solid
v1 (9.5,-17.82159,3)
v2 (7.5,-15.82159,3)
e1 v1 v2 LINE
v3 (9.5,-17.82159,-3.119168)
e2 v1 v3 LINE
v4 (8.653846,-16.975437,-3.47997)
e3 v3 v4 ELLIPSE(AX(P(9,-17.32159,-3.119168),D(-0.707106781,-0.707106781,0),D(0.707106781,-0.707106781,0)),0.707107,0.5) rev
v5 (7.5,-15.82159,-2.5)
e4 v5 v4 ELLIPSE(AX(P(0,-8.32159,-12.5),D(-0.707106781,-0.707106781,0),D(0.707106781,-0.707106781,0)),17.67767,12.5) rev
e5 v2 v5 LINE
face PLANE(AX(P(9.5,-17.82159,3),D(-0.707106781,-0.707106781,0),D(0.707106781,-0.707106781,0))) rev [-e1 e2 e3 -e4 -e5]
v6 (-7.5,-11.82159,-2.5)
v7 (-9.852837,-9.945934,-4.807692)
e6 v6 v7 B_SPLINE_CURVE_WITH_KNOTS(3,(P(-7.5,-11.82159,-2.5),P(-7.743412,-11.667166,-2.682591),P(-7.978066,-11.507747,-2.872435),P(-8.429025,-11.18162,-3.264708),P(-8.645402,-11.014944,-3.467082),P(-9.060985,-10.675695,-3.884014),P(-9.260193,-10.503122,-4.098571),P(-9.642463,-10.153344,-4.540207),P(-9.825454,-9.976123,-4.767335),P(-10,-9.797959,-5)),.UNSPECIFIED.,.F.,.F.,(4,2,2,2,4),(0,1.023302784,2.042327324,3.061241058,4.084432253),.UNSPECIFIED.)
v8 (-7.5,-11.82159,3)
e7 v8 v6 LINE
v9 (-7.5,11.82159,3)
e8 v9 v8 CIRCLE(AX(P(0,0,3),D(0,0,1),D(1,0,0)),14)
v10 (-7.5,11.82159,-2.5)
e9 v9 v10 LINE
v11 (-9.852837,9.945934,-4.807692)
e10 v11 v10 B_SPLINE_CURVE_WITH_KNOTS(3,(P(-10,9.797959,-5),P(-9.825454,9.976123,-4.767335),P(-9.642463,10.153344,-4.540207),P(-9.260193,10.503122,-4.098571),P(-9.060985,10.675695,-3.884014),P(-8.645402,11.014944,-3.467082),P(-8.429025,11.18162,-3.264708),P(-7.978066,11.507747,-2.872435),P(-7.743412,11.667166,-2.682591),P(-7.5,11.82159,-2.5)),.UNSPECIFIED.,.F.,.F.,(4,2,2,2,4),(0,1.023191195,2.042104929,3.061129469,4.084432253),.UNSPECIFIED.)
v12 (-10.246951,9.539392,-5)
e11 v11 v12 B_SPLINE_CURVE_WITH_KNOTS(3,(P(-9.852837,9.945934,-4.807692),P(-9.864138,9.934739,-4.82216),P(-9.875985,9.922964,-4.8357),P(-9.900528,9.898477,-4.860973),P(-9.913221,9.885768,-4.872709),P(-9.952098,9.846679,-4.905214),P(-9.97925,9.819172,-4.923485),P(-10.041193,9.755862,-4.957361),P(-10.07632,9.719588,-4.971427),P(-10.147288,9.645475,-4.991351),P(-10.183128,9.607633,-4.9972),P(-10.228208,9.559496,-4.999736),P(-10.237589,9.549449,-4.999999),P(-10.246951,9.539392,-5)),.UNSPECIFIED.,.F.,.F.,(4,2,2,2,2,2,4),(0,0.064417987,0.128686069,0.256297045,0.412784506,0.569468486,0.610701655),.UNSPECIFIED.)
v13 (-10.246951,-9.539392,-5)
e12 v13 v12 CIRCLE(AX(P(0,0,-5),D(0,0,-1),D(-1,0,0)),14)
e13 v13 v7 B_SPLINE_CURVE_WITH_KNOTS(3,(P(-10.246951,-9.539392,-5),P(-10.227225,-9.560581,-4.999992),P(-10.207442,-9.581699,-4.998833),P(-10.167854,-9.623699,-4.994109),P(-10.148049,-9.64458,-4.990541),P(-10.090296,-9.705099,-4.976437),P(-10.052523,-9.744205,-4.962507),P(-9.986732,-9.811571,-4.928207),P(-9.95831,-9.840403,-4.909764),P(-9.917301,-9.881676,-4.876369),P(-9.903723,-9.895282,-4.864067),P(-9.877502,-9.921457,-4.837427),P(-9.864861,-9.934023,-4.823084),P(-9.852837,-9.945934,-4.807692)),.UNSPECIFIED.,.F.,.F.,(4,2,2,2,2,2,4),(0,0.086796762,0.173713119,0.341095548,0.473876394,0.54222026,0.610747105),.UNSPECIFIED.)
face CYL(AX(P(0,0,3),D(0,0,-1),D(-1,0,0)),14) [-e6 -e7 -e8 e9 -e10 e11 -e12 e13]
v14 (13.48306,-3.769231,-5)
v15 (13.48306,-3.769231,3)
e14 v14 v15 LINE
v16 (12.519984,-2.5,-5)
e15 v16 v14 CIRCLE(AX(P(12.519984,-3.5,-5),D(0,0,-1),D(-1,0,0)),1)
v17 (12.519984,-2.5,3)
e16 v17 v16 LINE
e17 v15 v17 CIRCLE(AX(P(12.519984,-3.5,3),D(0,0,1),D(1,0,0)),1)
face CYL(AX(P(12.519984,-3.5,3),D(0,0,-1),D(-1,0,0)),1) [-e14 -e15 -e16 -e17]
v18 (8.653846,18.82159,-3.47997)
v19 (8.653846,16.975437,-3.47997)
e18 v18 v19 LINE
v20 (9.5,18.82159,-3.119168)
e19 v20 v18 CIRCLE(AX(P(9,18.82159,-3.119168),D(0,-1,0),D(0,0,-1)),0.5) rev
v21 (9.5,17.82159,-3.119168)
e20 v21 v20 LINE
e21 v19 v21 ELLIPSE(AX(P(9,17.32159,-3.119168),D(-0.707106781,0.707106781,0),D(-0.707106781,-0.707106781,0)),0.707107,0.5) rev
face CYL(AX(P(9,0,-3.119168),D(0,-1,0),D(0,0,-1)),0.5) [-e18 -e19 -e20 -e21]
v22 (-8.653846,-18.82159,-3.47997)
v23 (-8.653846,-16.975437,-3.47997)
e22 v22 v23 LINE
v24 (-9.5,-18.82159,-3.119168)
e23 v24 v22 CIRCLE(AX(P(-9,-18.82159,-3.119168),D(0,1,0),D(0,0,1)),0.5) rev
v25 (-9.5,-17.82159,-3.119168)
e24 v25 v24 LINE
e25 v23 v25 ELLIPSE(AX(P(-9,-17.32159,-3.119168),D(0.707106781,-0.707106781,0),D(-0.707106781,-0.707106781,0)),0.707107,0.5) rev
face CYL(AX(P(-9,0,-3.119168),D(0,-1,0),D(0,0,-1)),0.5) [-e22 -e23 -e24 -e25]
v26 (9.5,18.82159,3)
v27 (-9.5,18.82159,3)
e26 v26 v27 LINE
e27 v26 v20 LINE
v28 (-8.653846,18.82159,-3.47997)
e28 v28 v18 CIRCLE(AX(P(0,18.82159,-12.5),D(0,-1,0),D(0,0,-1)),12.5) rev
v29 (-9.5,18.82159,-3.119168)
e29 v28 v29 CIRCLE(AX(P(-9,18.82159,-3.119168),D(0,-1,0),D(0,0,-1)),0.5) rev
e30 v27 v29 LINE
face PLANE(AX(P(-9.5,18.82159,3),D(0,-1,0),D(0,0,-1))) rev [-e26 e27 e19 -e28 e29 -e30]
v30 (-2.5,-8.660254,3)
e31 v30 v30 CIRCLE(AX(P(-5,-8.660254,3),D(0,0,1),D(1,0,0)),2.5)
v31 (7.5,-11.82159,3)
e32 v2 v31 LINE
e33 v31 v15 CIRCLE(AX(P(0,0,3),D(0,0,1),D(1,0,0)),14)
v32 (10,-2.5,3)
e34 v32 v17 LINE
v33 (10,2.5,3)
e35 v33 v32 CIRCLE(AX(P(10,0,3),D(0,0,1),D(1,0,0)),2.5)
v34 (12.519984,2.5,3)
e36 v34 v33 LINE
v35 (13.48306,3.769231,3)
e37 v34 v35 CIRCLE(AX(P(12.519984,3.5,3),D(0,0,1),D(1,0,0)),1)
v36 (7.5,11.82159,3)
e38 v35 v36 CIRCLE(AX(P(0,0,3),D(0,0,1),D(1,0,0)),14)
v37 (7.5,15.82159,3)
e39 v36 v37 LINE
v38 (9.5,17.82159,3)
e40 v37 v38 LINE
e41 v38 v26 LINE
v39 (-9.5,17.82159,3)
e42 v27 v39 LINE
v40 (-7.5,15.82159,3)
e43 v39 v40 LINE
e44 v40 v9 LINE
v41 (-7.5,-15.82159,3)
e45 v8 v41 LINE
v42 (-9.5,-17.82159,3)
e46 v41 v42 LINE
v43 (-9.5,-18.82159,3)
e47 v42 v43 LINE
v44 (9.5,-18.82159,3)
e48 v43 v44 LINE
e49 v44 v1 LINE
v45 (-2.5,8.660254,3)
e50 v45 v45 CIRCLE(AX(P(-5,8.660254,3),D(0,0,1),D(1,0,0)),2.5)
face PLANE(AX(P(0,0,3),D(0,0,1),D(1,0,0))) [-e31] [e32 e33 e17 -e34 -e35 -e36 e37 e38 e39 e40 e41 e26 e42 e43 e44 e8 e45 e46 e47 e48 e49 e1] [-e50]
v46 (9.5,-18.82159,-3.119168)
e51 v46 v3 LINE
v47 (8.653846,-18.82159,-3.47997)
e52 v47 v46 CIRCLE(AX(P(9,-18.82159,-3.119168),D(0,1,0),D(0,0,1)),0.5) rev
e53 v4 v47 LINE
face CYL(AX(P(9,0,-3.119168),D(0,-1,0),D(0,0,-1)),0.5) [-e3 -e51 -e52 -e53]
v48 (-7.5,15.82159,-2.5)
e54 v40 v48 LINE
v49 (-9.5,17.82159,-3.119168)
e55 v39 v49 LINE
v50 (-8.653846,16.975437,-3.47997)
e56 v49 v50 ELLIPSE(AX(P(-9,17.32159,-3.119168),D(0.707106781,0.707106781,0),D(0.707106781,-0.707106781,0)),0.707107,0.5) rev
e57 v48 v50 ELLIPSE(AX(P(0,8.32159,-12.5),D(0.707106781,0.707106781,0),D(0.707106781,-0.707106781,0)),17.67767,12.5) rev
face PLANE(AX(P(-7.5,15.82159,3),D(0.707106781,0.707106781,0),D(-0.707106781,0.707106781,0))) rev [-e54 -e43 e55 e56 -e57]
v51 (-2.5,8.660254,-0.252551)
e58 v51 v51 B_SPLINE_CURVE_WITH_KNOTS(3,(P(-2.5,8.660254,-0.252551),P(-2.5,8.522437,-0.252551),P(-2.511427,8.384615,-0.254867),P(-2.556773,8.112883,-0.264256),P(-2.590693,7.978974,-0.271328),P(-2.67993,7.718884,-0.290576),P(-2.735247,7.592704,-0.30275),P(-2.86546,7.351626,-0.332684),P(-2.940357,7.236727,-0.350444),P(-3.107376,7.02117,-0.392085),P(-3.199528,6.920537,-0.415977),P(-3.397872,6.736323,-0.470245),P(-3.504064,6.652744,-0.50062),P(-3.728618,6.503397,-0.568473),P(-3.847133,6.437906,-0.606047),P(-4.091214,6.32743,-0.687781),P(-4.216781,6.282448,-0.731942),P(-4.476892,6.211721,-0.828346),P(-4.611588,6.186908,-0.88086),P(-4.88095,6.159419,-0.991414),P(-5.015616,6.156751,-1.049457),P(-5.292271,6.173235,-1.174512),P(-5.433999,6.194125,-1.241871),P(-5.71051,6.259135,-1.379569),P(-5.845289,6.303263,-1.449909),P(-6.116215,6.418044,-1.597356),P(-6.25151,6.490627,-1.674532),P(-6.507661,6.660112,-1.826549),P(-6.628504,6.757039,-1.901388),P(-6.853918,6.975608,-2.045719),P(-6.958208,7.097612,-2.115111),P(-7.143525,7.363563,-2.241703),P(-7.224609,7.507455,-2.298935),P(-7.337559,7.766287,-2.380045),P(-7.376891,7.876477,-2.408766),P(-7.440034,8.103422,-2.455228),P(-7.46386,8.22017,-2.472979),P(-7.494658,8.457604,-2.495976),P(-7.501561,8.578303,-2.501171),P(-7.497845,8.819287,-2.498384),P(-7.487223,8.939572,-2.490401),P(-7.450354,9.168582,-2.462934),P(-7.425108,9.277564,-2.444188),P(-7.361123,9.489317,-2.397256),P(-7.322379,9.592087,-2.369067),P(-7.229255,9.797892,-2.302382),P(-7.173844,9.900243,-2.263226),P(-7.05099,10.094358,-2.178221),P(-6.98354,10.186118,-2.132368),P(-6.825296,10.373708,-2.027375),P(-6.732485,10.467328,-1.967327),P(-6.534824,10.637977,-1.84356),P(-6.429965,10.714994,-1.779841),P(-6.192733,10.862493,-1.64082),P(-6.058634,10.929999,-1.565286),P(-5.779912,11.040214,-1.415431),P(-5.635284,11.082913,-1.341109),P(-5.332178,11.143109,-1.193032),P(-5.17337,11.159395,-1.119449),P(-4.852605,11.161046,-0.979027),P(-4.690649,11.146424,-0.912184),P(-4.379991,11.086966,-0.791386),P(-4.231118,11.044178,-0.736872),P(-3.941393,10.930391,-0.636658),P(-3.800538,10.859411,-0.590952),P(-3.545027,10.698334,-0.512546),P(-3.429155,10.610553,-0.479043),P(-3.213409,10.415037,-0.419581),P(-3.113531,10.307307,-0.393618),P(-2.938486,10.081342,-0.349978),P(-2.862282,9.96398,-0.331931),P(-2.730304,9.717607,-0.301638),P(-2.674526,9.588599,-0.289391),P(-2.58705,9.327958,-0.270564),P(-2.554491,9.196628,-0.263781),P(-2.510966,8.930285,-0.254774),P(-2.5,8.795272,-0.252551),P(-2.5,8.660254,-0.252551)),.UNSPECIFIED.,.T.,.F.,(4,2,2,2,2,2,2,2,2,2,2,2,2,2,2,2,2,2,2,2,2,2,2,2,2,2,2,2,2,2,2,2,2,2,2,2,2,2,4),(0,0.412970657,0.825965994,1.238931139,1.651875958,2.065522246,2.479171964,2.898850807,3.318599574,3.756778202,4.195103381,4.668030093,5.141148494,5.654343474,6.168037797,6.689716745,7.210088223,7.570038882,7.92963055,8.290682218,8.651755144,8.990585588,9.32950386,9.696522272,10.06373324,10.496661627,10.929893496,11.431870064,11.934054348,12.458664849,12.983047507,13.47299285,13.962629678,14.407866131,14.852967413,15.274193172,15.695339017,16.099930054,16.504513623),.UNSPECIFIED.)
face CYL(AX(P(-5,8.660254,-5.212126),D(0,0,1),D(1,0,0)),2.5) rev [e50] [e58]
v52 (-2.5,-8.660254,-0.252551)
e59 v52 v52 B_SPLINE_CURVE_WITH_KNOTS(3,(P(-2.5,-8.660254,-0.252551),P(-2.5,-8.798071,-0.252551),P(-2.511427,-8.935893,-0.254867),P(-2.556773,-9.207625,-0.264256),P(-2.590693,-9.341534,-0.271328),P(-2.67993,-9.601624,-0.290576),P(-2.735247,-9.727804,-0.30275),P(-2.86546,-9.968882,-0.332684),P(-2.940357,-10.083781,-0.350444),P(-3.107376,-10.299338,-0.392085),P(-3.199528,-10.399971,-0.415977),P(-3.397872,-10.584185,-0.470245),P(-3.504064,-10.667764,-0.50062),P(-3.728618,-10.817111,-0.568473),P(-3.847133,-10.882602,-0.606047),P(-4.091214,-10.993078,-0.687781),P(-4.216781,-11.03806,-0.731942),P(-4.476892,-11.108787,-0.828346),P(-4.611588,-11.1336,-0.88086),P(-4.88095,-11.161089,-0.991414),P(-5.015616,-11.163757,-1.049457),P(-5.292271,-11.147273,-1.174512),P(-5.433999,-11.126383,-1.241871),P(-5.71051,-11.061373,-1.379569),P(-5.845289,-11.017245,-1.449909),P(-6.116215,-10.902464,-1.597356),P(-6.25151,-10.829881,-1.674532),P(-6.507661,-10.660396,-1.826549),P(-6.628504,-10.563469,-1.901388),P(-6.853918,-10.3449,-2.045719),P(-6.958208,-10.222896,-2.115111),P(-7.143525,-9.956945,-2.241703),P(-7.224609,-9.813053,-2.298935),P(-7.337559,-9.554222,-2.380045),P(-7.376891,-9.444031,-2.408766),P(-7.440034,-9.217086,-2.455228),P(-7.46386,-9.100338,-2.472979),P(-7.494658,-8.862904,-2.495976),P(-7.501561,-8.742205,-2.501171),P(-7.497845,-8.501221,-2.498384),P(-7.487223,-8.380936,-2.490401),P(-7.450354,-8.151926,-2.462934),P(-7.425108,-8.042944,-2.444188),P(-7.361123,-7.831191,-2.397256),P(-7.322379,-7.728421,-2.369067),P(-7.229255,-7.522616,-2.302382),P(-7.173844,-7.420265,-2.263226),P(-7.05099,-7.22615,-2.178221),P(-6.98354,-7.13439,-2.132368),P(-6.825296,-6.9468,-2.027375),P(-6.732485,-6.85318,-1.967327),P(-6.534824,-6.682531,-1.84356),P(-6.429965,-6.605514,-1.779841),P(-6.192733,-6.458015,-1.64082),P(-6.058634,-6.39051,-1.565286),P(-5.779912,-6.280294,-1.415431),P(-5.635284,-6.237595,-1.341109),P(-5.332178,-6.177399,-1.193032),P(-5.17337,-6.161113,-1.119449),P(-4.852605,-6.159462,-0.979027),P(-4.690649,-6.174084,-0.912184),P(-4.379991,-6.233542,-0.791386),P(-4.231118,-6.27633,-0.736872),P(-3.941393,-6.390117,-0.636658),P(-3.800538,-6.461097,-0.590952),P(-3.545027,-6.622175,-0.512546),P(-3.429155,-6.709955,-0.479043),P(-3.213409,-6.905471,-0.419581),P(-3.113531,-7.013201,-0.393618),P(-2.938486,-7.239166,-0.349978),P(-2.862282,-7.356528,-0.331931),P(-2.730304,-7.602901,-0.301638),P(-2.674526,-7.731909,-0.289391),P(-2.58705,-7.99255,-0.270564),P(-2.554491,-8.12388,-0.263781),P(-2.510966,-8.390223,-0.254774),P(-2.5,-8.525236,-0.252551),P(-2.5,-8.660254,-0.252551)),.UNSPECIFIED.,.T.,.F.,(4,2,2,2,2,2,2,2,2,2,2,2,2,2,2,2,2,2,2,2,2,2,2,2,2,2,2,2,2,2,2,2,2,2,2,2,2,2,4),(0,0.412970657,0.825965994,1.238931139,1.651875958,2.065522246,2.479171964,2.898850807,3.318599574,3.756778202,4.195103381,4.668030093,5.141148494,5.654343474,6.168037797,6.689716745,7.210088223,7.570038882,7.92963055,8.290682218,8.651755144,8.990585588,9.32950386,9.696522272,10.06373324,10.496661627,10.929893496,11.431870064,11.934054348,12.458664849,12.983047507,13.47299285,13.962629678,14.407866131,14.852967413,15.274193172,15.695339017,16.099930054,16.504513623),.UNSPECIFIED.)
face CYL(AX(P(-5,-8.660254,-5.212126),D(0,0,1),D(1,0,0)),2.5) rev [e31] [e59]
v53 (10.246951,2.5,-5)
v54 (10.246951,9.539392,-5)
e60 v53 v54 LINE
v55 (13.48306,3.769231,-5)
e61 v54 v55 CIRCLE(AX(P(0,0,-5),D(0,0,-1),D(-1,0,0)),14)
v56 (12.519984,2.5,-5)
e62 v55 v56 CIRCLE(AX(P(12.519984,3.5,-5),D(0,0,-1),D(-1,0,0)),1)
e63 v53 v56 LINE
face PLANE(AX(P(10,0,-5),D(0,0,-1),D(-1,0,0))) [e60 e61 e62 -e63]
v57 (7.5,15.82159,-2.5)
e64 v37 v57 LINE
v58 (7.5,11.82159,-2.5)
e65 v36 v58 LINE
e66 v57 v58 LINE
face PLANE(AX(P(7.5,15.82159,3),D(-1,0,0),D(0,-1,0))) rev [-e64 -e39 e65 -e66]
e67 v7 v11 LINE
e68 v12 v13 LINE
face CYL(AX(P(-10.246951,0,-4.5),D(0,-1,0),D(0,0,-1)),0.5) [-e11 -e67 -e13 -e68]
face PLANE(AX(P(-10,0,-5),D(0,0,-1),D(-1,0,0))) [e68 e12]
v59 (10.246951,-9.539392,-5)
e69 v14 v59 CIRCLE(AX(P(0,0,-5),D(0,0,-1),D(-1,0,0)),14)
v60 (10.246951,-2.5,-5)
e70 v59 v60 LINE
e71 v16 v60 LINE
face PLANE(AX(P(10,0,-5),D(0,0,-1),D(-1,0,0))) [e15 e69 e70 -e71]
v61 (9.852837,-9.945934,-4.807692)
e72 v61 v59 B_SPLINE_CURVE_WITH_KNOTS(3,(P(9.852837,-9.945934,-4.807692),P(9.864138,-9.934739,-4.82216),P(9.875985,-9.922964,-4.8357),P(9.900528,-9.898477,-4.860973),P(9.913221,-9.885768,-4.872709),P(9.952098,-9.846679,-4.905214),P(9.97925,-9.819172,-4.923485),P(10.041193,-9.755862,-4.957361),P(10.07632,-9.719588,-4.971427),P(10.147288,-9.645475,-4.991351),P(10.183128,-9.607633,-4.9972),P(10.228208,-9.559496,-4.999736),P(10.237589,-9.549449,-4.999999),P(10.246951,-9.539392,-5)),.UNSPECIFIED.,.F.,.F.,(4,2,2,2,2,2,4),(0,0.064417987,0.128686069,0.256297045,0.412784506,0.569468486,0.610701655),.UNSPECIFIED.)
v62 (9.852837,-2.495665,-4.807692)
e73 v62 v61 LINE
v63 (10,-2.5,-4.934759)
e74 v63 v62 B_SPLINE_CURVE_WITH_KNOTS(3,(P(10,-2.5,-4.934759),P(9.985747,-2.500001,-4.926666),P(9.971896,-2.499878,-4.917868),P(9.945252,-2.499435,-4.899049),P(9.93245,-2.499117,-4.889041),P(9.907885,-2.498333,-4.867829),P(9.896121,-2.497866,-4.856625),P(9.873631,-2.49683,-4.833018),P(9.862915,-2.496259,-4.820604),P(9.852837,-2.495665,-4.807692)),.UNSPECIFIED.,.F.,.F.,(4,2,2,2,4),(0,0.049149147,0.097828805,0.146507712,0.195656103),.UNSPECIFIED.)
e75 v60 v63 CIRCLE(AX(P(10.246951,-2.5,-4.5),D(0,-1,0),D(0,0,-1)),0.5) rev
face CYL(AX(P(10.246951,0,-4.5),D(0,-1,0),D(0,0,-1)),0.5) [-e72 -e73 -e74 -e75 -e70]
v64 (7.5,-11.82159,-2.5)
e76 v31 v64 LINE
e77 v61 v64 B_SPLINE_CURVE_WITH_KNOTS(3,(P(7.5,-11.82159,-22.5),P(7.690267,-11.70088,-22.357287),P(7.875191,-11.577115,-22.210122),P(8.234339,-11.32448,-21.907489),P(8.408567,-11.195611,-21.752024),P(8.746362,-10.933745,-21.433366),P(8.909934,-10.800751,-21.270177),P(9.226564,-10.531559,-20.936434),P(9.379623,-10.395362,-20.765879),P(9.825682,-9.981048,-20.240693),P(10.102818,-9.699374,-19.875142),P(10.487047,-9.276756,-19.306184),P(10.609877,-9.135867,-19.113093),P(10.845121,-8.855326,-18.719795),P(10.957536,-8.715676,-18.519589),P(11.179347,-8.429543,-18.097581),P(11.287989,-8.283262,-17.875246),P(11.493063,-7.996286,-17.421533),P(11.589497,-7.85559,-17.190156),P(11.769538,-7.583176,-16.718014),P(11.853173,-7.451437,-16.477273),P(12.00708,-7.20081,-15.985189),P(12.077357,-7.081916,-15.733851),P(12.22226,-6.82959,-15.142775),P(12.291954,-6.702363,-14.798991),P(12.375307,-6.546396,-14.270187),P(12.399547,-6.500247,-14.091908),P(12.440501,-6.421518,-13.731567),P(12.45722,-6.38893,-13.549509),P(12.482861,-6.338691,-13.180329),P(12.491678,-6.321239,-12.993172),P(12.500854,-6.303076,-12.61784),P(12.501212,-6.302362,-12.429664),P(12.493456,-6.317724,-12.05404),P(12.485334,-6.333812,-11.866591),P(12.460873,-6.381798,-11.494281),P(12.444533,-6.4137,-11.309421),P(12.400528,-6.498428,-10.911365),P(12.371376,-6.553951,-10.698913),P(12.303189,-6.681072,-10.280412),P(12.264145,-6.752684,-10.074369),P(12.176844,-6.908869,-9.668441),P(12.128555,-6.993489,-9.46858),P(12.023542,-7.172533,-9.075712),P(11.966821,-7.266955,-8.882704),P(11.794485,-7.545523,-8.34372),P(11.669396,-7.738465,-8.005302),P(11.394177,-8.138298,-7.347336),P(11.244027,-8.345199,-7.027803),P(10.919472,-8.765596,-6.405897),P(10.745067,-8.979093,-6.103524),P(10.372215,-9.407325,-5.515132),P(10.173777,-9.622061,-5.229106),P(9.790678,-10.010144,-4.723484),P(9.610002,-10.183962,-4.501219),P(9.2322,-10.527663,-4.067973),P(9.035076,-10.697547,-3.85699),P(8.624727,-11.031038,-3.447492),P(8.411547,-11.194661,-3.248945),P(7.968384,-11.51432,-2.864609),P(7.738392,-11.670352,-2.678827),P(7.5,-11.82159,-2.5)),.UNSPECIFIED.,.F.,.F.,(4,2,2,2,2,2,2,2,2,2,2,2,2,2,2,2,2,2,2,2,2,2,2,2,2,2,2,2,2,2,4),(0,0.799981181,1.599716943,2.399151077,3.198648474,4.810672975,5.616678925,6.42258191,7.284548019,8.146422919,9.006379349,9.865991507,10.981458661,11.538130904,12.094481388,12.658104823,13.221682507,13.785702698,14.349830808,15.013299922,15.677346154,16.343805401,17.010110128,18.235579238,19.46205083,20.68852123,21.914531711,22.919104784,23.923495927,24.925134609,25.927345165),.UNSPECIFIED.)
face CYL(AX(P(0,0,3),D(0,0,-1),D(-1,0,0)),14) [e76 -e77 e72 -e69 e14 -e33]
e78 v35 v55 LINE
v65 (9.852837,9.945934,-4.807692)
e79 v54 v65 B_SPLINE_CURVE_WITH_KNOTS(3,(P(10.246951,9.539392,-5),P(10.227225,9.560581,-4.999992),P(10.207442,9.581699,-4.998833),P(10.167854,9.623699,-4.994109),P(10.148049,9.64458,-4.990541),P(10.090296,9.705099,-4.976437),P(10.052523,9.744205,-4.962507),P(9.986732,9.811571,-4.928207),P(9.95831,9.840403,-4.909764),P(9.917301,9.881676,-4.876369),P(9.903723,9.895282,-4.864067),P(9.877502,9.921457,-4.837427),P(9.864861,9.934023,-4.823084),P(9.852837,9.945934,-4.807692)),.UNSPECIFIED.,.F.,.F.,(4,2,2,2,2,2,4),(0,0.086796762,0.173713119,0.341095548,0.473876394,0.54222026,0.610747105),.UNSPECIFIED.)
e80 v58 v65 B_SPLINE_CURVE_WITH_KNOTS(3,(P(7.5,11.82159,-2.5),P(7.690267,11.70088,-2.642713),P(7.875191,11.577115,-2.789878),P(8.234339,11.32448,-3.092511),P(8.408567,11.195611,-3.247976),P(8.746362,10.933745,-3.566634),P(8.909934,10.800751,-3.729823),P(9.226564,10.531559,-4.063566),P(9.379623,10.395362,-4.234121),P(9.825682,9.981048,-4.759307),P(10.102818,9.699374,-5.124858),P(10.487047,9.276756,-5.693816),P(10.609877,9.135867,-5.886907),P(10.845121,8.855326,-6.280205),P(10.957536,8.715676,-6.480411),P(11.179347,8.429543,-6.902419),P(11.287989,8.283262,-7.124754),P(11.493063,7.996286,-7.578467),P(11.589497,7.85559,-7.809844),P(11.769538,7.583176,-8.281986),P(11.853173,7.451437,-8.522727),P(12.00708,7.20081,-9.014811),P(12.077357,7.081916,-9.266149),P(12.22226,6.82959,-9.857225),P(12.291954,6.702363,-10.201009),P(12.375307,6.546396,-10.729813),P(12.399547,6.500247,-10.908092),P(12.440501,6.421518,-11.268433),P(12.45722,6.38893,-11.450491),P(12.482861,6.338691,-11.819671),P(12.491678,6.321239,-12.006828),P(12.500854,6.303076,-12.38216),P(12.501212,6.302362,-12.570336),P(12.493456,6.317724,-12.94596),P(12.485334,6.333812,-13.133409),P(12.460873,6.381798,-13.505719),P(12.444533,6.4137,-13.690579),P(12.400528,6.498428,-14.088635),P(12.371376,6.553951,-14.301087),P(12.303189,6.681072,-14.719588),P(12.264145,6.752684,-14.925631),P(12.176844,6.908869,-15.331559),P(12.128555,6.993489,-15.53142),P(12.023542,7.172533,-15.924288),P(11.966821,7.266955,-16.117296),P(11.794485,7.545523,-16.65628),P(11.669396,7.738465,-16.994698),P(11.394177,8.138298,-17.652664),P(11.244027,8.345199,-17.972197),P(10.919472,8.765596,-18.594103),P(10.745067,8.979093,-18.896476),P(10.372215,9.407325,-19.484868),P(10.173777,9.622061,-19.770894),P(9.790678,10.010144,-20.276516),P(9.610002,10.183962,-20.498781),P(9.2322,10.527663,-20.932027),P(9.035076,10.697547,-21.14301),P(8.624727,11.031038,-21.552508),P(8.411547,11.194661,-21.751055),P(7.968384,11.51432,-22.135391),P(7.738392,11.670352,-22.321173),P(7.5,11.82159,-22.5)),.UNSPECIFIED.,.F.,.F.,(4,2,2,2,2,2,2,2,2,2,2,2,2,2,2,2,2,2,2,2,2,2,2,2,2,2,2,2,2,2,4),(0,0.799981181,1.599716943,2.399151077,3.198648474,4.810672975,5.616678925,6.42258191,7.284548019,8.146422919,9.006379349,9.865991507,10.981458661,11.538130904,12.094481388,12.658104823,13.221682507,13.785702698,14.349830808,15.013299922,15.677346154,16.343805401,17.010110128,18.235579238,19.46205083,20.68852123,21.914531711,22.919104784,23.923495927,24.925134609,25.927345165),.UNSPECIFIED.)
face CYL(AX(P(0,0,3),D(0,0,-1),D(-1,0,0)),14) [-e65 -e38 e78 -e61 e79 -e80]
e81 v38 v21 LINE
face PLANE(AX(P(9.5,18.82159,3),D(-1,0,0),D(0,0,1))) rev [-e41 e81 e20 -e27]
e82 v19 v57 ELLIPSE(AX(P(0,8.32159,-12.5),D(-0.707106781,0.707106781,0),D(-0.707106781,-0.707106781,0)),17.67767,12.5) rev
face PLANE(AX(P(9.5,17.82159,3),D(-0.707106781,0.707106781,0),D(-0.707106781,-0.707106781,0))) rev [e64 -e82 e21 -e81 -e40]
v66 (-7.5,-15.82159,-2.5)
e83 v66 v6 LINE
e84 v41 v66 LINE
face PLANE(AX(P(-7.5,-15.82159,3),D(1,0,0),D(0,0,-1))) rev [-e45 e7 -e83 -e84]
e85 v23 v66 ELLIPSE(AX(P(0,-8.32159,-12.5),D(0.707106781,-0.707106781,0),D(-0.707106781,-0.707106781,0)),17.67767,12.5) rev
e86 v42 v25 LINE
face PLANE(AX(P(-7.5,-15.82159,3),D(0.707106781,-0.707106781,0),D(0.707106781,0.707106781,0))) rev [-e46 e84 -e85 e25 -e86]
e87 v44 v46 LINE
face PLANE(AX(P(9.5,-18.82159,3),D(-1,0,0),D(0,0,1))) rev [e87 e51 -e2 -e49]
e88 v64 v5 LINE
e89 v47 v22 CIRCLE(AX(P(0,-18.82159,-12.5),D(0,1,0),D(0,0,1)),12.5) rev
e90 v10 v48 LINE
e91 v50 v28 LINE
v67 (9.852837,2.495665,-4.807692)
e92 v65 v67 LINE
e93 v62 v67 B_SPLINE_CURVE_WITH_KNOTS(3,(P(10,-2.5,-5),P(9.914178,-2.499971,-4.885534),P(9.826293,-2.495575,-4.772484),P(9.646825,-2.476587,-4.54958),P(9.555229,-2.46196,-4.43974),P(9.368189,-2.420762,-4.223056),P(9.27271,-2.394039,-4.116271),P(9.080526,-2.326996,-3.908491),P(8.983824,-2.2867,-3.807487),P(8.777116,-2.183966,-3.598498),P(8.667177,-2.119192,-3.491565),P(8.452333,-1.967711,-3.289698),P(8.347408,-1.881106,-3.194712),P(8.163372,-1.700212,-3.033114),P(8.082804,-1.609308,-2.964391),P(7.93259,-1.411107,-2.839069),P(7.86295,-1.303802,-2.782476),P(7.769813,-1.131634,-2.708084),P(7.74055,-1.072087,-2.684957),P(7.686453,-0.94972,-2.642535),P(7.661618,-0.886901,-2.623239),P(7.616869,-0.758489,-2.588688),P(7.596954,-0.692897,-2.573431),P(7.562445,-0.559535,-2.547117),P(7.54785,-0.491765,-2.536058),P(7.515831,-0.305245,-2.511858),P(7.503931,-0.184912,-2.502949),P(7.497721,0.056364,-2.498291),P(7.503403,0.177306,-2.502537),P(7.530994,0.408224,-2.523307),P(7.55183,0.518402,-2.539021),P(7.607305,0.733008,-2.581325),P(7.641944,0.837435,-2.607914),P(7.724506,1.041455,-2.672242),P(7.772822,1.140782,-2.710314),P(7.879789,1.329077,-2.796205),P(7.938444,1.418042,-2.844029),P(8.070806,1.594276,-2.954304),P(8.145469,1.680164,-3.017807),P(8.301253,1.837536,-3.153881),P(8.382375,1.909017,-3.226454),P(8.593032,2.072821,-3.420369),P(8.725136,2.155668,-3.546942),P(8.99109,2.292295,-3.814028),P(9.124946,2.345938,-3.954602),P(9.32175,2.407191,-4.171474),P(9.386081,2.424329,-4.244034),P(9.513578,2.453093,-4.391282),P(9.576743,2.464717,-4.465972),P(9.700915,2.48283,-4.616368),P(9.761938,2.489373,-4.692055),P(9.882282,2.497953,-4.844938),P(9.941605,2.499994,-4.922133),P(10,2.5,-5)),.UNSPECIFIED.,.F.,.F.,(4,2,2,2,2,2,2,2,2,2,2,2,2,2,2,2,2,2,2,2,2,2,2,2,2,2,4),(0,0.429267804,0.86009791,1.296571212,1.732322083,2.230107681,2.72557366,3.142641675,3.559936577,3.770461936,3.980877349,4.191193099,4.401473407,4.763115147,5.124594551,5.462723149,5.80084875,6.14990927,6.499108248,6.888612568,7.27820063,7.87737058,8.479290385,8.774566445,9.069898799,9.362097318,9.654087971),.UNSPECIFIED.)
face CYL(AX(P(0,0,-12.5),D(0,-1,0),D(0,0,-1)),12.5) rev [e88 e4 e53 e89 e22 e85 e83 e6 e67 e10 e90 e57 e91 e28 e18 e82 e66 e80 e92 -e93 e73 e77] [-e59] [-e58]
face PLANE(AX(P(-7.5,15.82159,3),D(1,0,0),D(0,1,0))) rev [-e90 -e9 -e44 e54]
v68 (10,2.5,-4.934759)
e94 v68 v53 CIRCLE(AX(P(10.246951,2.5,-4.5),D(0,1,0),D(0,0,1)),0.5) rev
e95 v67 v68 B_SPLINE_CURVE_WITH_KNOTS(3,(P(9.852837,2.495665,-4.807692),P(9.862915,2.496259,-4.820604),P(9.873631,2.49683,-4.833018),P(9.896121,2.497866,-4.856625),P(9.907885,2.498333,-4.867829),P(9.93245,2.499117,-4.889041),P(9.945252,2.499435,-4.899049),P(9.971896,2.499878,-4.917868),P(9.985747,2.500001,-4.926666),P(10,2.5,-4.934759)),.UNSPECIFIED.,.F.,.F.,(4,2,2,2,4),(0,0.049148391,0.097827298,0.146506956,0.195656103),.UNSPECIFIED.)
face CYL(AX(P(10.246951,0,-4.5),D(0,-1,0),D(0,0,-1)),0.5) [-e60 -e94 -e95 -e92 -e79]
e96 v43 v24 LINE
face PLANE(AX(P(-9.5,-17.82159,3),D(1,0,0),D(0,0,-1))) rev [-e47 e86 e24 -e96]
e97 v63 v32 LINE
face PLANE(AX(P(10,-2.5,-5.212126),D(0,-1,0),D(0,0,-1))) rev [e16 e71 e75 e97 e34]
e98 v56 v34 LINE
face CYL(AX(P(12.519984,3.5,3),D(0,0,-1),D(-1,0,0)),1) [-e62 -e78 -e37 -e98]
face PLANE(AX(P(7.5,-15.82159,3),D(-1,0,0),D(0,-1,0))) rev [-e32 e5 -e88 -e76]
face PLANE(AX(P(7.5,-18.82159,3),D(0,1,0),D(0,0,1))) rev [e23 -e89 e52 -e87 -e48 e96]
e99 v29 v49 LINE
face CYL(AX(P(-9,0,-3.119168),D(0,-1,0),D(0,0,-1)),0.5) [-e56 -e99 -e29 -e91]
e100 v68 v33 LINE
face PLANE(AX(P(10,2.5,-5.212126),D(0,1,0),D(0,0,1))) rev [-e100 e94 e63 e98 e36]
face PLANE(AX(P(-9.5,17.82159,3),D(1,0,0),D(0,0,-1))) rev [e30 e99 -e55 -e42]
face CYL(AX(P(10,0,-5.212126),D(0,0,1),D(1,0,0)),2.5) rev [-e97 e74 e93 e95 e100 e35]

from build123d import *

# Parameters (mm, degrees)
SKETCH1_R               = 1.350662837
BOSS_EXTRUDE1_DEPTH     = 3
BOSS_EXTRUDE2_OUTLINE_R = 1.350662837
BOSS_EXTRUDE2_DEPTH     = 5
BOSS_EXTRUDE2_START     = -18.821590418
BOSS_EXTRUDE2_2_DEPTH   = 37.643180836
FILLET1_R               = 0.5
SKETCH5_R               = 2.5
CUT_EXTRUDE1_DEPTH      = 25.78411334
FILLET2_R               = 0.5
FILLET3_R               = 1


with BuildPart() as part:
    # Sketch1 → Boss-Extrude1 (new body)
    with BuildSketch(Plane.XY):
        with BuildLine():
            Line((7.5, 18.821590418), (9.5, 18.821590418))
            Line((9.5, 18.821590418), (9.5, 17.821590418))
            Line((9.5, 17.821590418), (7.5, 15.821590418))
            Line((7.5, 15.821590418), (7.5, 11.821590418))
            ThreePointArc((7.5, 11.821590418), (14, 0), (7.5, -11.821590418))
            Line((7.5, -11.821590418), (7.5, -15.821590418))
            Line((7.5, -15.821590418), (9.5, -17.821590418))
            Line((9.5, -17.821590418), (9.5, -18.821590418))
            Line((9.5, -18.821590418), (7.5, -18.821590418))
            Line((7.5, -18.821590418), (-7.5, -18.821590418))
            Line((-7.5, -18.821590418), (-9.5, -18.821590418))
            Line((-9.5, -18.821590418), (-9.5, -17.821590418))
            Line((-9.5, -17.821590418), (-7.5, -15.821590418))
            Line((-7.5, -15.821590418), (-7.5, -11.821590418))
            ThreePointArc((-7.5, -11.821590418), (-14, 0), (-7.5, 11.821590418))
            Line((-7.5, 11.821590418), (-7.5, 15.821590418))
            Line((-7.5, 15.821590418), (-9.5, 17.821590418))
            Line((-9.5, 17.821590418), (-9.5, 18.821590418))
            Line((-9.5, 18.821590418), (-7.5, 18.821590418))
            Line((-7.5, 18.821590418), (7.5, 18.821590418))
        make_face()
        with Locations((-5, -8.660254038)):
            Circle(SKETCH1_R, mode=Mode.SUBTRACT)
        with Locations((10, 0)):
            Circle(SKETCH1_R, mode=Mode.SUBTRACT)
        with Locations((-5, 8.660254038)):
            Circle(SKETCH1_R, mode=Mode.SUBTRACT)
    extrude(amount=BOSS_EXTRUDE1_DEPTH)

    # Boss-Extrude2: read off the stored shape, not the designer's step
    # Boss-Extrude2 outline → Boss-Extrude2 (add)
    with BuildSketch(Plane(origin=(0, 0, 0), x_dir=(-1, 0, 0), z_dir=(0, 0, -1))):
        with BuildLine():
            Line((-7.5, 15.821590418), (-7.5, 11.821590418))
            ThreePointArc((-7.5, 11.821590418), (-14, 0), (-7.5, -11.821590418))
            Line((-7.5, -11.821590418), (-7.5, -15.821590418))
            Line((-7.5, -15.821590418), (-9.5, -17.821590418))
            Line((-9.5, -17.821590418), (-9.5, -18.821590418))
            Line((-9.5, -18.821590418), (9.5, -18.821590418))
            Line((9.5, -18.821590418), (9.5, -17.821590418))
            Line((9.5, -17.821590418), (7.5, -15.821590418))
            Line((7.5, -15.821590418), (7.5, -11.821590418))
            ThreePointArc((7.5, -11.821590418), (14, 0), (7.5, 11.821590418))
            Line((7.5, 11.821590418), (7.5, 15.821590418))
            Line((7.5, 15.821590418), (9.5, 17.821590418))
            Line((9.5, 17.821590418), (9.5, 18.821590418))
            Line((9.5, 18.821590418), (-9.5, 18.821590418))
            Line((-9.5, 18.821590418), (-9.5, 17.821590418))
            Line((-9.5, 17.821590418), (-7.5, 15.821590418))
        make_face()
        with Locations((5, -8.660254038)):
            Circle(BOSS_EXTRUDE2_OUTLINE_R, mode=Mode.SUBTRACT)
        with Locations((-10, 0)):
            Circle(BOSS_EXTRUDE2_OUTLINE_R, mode=Mode.SUBTRACT)
        with Locations((5, 8.660254038)):
            Circle(BOSS_EXTRUDE2_OUTLINE_R, mode=Mode.SUBTRACT)
    extrude(amount=BOSS_EXTRUDE2_DEPTH)

    # Boss-Extrude2 2 outline → Boss-Extrude2 2 (cut)
    with BuildSketch(Plane(origin=(0, 0, 0), x_dir=(1, 0, 0), z_dir=(0, 1, 0)).offset(BOSS_EXTRUDE2_START)):
        with BuildLine():
            Line((10, 5), (-10, 5))
            ThreePointArc((-10, 5), (0, 0), (10, 5))
        make_face()
    extrude(amount=BOSS_EXTRUDE2_2_DEPTH, mode=Mode.SUBTRACT)

    # Fillet1
    fillet1_edges = [part.edges().sort_by_distance(p)[0] for p in [
        (9.5, 18.321590418, -4.375961595),
        (9.5, -18.321590418, -4.375961595),
        (-9.5, -18.321590418, -4.375961595),
        (-9.5, 18.321590418, -4.375961595),
    ]]
    fillet(fillet1_edges, radius=FILLET1_R)

    # Sketch5 → Cut-Extrude1 (cut, through all)
    with BuildSketch(Plane.XY.offset(3)):
        with Locations((-5, -8.660254038)):
            Circle(SKETCH5_R)
        with Locations((-5, 8.660254038)):
            Circle(SKETCH5_R)
        with BuildLine():
            Line((10, -2.5), (13.774977314, -2.5))
            ThreePointArc((13.774977314, -2.5), (14, 0), (13.774977314, 2.5))
            Line((13.774977314, 2.5), (10, 2.5))
            ThreePointArc((10, 2.5), (7.5, 0), (10, -2.5))
        make_face()
    extrude(amount=-CUT_EXTRUDE1_DEPTH, mode=Mode.SUBTRACT)

    # Fillet2
    fillet2_edges = [part.edges().sort_by_distance(p)[0] for p in [
        (-10, 0, -5),
        (10, -6.148979486, -5),
        (10, 6.148979486, -5),
    ]]
    fillet(fillet2_edges, radius=FILLET2_R)

    # Fillet3
    fillet3_edges = [part.edges().sort_by_distance(p)[0] for p in [
        (13.774977314, 2.5, -2.5),
        (13.774977314, -2.5, -2.5),
    ]]
    fillet(fillet3_edges, radius=FILLET3_R)


solid = part.part
